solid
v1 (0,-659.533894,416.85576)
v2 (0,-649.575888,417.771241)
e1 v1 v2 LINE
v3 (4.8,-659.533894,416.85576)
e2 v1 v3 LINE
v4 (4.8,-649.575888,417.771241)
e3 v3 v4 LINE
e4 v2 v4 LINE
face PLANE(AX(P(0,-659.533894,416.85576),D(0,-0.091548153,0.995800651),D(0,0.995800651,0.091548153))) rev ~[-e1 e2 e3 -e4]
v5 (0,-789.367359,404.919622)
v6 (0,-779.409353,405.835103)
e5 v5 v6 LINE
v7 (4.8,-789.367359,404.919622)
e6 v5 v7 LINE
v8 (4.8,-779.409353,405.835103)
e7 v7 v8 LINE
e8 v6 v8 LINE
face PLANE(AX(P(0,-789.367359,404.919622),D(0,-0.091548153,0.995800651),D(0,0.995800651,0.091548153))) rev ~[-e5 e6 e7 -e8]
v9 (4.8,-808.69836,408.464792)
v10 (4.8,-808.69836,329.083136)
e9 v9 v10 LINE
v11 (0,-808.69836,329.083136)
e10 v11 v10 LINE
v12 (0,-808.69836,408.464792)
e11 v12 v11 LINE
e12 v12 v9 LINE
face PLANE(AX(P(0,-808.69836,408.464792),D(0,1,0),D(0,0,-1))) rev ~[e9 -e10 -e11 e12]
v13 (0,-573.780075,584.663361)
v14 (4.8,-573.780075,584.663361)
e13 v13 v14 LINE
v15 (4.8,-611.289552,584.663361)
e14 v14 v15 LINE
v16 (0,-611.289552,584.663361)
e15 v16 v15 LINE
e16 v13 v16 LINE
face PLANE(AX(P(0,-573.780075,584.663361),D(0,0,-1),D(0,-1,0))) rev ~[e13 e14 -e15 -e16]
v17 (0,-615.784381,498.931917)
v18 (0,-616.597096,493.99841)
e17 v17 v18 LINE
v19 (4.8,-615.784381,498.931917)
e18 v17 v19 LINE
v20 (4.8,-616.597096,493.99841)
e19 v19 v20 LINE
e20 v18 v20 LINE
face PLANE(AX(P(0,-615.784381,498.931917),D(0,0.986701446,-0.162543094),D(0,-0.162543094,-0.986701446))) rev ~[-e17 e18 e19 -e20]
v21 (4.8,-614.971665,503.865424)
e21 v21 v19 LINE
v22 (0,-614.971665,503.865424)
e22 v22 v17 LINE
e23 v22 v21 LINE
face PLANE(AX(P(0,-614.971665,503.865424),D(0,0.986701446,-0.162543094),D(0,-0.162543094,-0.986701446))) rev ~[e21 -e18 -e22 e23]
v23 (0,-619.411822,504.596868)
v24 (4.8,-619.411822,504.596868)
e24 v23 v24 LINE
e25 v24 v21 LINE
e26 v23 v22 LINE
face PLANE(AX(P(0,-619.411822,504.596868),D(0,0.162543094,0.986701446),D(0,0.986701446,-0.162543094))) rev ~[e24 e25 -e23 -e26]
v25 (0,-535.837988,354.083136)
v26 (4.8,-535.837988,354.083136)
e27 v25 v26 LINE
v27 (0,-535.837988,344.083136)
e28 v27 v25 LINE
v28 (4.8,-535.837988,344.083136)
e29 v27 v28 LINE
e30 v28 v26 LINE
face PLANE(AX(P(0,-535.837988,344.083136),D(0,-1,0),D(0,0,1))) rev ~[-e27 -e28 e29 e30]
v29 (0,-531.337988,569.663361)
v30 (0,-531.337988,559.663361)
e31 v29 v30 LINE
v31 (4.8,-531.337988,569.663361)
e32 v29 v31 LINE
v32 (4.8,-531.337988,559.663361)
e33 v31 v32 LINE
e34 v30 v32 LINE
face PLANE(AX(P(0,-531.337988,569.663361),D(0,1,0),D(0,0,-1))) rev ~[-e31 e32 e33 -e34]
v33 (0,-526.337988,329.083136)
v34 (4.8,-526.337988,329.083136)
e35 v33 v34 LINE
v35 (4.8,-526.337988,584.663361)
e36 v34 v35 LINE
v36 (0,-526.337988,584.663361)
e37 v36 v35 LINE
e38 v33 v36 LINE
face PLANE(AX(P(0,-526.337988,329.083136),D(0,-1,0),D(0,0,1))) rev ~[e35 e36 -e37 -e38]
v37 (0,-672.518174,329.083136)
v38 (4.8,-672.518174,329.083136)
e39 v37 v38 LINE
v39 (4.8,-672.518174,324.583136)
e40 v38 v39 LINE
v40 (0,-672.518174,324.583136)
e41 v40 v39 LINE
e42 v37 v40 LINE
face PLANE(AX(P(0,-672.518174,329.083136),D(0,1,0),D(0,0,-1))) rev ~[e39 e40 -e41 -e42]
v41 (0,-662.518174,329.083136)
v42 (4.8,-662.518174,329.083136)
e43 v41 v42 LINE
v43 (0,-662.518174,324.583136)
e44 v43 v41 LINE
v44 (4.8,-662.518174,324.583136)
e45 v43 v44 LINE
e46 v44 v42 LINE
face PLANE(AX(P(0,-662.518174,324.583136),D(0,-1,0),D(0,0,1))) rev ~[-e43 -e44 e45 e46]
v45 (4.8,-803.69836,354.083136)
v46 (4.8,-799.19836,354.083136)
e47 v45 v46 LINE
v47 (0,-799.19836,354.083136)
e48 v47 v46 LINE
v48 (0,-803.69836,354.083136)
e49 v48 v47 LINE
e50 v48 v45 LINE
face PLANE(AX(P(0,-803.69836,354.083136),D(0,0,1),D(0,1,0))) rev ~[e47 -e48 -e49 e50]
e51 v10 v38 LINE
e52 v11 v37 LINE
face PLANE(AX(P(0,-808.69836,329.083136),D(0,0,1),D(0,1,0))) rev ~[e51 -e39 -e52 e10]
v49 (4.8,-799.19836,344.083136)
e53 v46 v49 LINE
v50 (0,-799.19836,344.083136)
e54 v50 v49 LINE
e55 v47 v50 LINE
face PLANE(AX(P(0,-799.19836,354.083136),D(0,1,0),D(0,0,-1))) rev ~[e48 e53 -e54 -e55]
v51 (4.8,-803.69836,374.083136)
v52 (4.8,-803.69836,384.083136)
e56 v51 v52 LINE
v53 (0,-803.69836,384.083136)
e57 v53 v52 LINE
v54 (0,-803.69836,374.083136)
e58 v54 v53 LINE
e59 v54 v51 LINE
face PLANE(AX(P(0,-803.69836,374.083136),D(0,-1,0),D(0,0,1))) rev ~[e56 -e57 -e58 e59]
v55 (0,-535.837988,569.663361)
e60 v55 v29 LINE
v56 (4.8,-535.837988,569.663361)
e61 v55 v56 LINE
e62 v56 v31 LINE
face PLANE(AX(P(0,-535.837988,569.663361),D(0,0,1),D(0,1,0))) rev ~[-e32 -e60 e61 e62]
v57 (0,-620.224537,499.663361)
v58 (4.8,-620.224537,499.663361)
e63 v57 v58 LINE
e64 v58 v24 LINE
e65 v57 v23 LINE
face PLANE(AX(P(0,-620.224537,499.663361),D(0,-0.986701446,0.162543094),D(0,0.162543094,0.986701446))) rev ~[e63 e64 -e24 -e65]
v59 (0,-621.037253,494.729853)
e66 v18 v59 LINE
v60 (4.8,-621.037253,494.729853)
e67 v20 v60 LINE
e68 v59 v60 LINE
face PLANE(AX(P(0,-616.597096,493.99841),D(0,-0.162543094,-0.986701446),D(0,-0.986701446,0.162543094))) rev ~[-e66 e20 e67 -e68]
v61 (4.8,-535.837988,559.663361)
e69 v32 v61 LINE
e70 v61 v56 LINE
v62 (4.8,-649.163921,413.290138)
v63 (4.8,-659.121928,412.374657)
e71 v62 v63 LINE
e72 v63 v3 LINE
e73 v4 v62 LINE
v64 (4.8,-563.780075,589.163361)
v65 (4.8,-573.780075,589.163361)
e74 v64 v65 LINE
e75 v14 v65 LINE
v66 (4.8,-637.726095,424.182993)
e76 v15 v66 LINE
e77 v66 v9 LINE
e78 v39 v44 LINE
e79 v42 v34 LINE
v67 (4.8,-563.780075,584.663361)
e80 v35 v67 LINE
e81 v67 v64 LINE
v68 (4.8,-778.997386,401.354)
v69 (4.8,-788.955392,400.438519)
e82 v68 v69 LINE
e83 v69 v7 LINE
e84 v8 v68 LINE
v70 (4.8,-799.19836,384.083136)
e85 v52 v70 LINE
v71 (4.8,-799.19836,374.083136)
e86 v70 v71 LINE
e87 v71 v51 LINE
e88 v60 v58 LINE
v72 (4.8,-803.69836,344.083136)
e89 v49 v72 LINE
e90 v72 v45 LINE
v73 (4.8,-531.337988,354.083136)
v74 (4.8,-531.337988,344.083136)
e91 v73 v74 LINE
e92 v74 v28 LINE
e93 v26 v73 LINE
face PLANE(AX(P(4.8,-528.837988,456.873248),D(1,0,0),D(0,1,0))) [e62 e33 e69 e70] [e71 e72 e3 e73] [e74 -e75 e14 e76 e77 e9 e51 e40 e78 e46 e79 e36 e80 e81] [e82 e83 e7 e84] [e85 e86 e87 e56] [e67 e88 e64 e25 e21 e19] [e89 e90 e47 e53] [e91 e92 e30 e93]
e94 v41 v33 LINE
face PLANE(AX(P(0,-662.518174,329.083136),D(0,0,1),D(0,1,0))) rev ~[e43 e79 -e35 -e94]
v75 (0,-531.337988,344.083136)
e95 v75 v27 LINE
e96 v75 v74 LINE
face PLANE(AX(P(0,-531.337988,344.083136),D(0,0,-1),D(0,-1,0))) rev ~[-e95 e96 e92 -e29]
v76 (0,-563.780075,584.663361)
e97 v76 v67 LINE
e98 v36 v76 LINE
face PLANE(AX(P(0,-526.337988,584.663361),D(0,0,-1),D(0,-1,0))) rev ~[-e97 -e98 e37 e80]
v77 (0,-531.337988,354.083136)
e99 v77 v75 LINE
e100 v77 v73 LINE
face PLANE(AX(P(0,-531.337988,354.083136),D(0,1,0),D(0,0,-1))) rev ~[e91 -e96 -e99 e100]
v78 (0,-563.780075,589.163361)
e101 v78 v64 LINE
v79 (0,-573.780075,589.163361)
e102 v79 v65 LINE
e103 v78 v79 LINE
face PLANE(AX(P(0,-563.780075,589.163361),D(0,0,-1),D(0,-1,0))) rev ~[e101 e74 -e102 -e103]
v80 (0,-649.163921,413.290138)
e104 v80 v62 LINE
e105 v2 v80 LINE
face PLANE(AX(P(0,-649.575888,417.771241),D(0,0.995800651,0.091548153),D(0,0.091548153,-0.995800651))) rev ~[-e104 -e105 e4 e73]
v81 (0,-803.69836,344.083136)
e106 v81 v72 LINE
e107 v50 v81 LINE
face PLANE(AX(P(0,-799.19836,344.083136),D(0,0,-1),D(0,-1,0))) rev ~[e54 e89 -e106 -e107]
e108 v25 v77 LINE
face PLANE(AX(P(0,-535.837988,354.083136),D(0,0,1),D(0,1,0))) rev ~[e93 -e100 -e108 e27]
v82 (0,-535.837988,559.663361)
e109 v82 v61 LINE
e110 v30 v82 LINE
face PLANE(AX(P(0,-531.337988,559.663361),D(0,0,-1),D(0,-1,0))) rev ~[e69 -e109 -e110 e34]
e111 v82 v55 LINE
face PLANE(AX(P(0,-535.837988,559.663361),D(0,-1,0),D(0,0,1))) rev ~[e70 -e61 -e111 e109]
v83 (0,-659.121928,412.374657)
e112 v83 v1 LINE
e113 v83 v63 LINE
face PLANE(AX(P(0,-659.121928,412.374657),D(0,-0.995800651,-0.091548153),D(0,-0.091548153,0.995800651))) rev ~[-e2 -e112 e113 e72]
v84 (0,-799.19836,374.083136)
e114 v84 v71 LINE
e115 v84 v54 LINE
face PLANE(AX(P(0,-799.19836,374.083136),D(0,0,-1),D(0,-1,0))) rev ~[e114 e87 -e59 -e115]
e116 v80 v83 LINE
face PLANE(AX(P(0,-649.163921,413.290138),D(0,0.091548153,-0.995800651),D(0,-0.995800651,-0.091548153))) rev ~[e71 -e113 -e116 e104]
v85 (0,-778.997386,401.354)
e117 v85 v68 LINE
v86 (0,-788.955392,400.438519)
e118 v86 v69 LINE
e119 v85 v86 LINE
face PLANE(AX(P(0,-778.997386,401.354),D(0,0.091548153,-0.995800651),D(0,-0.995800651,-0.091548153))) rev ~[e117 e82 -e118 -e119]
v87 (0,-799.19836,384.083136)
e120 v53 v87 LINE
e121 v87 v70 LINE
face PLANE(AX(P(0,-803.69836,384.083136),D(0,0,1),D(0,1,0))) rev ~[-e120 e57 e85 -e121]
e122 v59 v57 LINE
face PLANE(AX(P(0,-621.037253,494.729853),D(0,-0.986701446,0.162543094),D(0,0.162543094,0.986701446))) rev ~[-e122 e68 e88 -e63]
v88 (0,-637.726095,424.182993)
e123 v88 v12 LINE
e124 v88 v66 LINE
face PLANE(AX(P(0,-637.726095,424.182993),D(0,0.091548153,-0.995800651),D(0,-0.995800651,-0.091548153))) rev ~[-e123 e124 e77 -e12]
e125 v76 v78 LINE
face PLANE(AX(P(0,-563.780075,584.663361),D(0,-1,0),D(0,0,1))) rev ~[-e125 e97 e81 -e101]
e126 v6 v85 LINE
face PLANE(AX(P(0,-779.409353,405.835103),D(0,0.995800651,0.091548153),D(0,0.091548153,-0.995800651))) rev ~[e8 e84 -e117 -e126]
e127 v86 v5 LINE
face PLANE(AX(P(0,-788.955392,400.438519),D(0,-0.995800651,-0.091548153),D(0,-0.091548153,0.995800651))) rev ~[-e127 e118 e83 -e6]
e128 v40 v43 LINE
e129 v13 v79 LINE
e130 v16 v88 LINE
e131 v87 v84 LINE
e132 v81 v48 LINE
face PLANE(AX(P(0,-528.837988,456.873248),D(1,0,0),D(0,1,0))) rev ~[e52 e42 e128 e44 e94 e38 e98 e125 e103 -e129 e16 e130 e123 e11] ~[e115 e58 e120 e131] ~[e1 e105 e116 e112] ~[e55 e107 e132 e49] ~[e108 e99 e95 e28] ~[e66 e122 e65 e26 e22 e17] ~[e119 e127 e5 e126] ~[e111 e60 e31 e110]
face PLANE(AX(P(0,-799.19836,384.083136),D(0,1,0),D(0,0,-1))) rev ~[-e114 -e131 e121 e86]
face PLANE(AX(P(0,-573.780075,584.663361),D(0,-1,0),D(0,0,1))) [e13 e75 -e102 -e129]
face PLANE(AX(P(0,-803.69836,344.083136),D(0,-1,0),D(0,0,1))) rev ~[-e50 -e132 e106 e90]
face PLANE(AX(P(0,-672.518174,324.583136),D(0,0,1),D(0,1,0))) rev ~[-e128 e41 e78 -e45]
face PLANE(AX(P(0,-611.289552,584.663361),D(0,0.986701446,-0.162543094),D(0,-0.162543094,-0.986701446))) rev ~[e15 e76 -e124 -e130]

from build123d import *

# Parameters (mm, degrees)
F0_W     = 5
F0_H     = 4.5
F1_DEPTH = 4.8


# Not quite as in the source:
# - a feature names something its author has since deleted; it is built from what else it names


with BuildPart() as f1:
    # F0 (on Right) → F1 (new body)
    with BuildSketch(Plane.YZ):
        Polygon((-531.3379881175, 344.0831357297), (-531.3379881175, 329.0831357297), (-526.3379881175, 329.0831357297), (-526.3379881175, 584.6633606824), (-531.3379881175, 584.6633606824), (-531.3379881175, 569.6633606824), (-531.3379881175, 559.6633606824), (-531.3379881175, 354.0831357297), align=None)
        Polygon((-611.2895517261, 584.6633606824), (-637.7260949769, 424.1829931527), (-639.3722244459, 414.1903303575), (-634.2269114077, 414.6633606824), (-621.0372525622, 494.7298534546), (-620.224537093, 499.6633606824), (-619.4118216237, 504.5968679101), (-606.2221627782, 584.6633606824), align=None)
        Polygon((-803.6983604223, 344.0831357297), (-803.6983604223, 329.0831357297), (-672.5181742699, 329.0831357297), (-672.5181742699, 324.5831357297), (-662.5181742699, 324.5831357297), (-662.5181742699, 329.0831357297), (-531.3379881175, 329.0831357297), (-531.3379881175, 344.0831357297), (-535.8379881175, 344.0831357297), (-535.8379881175, 354.0831357297), (-531.3379881175, 354.0831357297), (-531.3379881175, 559.6633606824), (-535.8379881175, 559.6633606824), (-535.8379881175, 569.6633606824), (-531.3379881175, 569.6633606824), (-531.3379881175, 584.6633606824), (-563.7800754478, 584.6633606824), (-568.7800754478, 584.6633606824), (-573.7800754478, 584.6633606824), (-606.2221627782, 584.6633606824), (-619.4118216237, 504.5968679101), (-614.9716651188, 503.8654239878), (-615.784380588, 498.93191676), (-616.5970960573, 493.9984095323), (-621.0372525622, 494.7298534546), (-634.2269114077, 414.6633606824), (-639.3722244459, 414.1903303575), (-649.1639211663, 413.2901383873), (-659.1219276721, 412.3746568573), (-778.9973858727, 401.3540004817), (-788.9553923784, 400.4385189517), (-803.6983604223, 399.0831357297), (-803.6983604223, 384.0831357297), (-799.1983604223, 384.0831357297), (-799.1983604223, 374.0831357297), (-803.6983604223, 374.0831357297), (-803.6983604223, 354.0831357297), (-799.1983604223, 354.0831357297), (-799.1983604223, 344.0831357297), align=None)
        Polygon((-808.6983604223, 329.0831357297), (-803.6983604223, 329.0831357297), (-803.6983604223, 344.0831357297), (-803.6983604223, 354.0831357297), (-803.6983604223, 374.0831357297), (-803.6983604223, 384.0831357297), (-803.6983604223, 399.0831357297), (-808.6983604223, 399.0831357297), (-808.6983604223, 374.0831357297), (-808.6983604223, 354.0831357297), align=None)
        Polygon((-808.6983604223, 403.4437065252), (-808.6983604223, 399.0831357297), (-803.6983604223, 399.0831357297), (-788.9553923784, 400.4385189517), (-789.3673590669, 404.9196218792), (-779.4093525612, 405.8351034093), (-778.9973858727, 401.3540004817), (-659.1219276721, 412.3746568573), (-659.5338943606, 416.8557597849), (-649.5758878549, 417.7712413149), (-649.1639211663, 413.2901383873), (-639.3722244459, 414.1903303575), (-637.7260949769, 424.1829931527), (-650.0610930658, 423.0489847629), (-808.6983604223, 408.4647918168), align=None)
        with Locations((-566.2800754478, 586.9133606824)):
            Rectangle(F0_W, F0_H)
        with Locations((-571.2800754478, 586.9133606824)):
            Rectangle(F0_W, F0_H)
    extrude(amount=F1_DEPTH)


solid = f1.part
